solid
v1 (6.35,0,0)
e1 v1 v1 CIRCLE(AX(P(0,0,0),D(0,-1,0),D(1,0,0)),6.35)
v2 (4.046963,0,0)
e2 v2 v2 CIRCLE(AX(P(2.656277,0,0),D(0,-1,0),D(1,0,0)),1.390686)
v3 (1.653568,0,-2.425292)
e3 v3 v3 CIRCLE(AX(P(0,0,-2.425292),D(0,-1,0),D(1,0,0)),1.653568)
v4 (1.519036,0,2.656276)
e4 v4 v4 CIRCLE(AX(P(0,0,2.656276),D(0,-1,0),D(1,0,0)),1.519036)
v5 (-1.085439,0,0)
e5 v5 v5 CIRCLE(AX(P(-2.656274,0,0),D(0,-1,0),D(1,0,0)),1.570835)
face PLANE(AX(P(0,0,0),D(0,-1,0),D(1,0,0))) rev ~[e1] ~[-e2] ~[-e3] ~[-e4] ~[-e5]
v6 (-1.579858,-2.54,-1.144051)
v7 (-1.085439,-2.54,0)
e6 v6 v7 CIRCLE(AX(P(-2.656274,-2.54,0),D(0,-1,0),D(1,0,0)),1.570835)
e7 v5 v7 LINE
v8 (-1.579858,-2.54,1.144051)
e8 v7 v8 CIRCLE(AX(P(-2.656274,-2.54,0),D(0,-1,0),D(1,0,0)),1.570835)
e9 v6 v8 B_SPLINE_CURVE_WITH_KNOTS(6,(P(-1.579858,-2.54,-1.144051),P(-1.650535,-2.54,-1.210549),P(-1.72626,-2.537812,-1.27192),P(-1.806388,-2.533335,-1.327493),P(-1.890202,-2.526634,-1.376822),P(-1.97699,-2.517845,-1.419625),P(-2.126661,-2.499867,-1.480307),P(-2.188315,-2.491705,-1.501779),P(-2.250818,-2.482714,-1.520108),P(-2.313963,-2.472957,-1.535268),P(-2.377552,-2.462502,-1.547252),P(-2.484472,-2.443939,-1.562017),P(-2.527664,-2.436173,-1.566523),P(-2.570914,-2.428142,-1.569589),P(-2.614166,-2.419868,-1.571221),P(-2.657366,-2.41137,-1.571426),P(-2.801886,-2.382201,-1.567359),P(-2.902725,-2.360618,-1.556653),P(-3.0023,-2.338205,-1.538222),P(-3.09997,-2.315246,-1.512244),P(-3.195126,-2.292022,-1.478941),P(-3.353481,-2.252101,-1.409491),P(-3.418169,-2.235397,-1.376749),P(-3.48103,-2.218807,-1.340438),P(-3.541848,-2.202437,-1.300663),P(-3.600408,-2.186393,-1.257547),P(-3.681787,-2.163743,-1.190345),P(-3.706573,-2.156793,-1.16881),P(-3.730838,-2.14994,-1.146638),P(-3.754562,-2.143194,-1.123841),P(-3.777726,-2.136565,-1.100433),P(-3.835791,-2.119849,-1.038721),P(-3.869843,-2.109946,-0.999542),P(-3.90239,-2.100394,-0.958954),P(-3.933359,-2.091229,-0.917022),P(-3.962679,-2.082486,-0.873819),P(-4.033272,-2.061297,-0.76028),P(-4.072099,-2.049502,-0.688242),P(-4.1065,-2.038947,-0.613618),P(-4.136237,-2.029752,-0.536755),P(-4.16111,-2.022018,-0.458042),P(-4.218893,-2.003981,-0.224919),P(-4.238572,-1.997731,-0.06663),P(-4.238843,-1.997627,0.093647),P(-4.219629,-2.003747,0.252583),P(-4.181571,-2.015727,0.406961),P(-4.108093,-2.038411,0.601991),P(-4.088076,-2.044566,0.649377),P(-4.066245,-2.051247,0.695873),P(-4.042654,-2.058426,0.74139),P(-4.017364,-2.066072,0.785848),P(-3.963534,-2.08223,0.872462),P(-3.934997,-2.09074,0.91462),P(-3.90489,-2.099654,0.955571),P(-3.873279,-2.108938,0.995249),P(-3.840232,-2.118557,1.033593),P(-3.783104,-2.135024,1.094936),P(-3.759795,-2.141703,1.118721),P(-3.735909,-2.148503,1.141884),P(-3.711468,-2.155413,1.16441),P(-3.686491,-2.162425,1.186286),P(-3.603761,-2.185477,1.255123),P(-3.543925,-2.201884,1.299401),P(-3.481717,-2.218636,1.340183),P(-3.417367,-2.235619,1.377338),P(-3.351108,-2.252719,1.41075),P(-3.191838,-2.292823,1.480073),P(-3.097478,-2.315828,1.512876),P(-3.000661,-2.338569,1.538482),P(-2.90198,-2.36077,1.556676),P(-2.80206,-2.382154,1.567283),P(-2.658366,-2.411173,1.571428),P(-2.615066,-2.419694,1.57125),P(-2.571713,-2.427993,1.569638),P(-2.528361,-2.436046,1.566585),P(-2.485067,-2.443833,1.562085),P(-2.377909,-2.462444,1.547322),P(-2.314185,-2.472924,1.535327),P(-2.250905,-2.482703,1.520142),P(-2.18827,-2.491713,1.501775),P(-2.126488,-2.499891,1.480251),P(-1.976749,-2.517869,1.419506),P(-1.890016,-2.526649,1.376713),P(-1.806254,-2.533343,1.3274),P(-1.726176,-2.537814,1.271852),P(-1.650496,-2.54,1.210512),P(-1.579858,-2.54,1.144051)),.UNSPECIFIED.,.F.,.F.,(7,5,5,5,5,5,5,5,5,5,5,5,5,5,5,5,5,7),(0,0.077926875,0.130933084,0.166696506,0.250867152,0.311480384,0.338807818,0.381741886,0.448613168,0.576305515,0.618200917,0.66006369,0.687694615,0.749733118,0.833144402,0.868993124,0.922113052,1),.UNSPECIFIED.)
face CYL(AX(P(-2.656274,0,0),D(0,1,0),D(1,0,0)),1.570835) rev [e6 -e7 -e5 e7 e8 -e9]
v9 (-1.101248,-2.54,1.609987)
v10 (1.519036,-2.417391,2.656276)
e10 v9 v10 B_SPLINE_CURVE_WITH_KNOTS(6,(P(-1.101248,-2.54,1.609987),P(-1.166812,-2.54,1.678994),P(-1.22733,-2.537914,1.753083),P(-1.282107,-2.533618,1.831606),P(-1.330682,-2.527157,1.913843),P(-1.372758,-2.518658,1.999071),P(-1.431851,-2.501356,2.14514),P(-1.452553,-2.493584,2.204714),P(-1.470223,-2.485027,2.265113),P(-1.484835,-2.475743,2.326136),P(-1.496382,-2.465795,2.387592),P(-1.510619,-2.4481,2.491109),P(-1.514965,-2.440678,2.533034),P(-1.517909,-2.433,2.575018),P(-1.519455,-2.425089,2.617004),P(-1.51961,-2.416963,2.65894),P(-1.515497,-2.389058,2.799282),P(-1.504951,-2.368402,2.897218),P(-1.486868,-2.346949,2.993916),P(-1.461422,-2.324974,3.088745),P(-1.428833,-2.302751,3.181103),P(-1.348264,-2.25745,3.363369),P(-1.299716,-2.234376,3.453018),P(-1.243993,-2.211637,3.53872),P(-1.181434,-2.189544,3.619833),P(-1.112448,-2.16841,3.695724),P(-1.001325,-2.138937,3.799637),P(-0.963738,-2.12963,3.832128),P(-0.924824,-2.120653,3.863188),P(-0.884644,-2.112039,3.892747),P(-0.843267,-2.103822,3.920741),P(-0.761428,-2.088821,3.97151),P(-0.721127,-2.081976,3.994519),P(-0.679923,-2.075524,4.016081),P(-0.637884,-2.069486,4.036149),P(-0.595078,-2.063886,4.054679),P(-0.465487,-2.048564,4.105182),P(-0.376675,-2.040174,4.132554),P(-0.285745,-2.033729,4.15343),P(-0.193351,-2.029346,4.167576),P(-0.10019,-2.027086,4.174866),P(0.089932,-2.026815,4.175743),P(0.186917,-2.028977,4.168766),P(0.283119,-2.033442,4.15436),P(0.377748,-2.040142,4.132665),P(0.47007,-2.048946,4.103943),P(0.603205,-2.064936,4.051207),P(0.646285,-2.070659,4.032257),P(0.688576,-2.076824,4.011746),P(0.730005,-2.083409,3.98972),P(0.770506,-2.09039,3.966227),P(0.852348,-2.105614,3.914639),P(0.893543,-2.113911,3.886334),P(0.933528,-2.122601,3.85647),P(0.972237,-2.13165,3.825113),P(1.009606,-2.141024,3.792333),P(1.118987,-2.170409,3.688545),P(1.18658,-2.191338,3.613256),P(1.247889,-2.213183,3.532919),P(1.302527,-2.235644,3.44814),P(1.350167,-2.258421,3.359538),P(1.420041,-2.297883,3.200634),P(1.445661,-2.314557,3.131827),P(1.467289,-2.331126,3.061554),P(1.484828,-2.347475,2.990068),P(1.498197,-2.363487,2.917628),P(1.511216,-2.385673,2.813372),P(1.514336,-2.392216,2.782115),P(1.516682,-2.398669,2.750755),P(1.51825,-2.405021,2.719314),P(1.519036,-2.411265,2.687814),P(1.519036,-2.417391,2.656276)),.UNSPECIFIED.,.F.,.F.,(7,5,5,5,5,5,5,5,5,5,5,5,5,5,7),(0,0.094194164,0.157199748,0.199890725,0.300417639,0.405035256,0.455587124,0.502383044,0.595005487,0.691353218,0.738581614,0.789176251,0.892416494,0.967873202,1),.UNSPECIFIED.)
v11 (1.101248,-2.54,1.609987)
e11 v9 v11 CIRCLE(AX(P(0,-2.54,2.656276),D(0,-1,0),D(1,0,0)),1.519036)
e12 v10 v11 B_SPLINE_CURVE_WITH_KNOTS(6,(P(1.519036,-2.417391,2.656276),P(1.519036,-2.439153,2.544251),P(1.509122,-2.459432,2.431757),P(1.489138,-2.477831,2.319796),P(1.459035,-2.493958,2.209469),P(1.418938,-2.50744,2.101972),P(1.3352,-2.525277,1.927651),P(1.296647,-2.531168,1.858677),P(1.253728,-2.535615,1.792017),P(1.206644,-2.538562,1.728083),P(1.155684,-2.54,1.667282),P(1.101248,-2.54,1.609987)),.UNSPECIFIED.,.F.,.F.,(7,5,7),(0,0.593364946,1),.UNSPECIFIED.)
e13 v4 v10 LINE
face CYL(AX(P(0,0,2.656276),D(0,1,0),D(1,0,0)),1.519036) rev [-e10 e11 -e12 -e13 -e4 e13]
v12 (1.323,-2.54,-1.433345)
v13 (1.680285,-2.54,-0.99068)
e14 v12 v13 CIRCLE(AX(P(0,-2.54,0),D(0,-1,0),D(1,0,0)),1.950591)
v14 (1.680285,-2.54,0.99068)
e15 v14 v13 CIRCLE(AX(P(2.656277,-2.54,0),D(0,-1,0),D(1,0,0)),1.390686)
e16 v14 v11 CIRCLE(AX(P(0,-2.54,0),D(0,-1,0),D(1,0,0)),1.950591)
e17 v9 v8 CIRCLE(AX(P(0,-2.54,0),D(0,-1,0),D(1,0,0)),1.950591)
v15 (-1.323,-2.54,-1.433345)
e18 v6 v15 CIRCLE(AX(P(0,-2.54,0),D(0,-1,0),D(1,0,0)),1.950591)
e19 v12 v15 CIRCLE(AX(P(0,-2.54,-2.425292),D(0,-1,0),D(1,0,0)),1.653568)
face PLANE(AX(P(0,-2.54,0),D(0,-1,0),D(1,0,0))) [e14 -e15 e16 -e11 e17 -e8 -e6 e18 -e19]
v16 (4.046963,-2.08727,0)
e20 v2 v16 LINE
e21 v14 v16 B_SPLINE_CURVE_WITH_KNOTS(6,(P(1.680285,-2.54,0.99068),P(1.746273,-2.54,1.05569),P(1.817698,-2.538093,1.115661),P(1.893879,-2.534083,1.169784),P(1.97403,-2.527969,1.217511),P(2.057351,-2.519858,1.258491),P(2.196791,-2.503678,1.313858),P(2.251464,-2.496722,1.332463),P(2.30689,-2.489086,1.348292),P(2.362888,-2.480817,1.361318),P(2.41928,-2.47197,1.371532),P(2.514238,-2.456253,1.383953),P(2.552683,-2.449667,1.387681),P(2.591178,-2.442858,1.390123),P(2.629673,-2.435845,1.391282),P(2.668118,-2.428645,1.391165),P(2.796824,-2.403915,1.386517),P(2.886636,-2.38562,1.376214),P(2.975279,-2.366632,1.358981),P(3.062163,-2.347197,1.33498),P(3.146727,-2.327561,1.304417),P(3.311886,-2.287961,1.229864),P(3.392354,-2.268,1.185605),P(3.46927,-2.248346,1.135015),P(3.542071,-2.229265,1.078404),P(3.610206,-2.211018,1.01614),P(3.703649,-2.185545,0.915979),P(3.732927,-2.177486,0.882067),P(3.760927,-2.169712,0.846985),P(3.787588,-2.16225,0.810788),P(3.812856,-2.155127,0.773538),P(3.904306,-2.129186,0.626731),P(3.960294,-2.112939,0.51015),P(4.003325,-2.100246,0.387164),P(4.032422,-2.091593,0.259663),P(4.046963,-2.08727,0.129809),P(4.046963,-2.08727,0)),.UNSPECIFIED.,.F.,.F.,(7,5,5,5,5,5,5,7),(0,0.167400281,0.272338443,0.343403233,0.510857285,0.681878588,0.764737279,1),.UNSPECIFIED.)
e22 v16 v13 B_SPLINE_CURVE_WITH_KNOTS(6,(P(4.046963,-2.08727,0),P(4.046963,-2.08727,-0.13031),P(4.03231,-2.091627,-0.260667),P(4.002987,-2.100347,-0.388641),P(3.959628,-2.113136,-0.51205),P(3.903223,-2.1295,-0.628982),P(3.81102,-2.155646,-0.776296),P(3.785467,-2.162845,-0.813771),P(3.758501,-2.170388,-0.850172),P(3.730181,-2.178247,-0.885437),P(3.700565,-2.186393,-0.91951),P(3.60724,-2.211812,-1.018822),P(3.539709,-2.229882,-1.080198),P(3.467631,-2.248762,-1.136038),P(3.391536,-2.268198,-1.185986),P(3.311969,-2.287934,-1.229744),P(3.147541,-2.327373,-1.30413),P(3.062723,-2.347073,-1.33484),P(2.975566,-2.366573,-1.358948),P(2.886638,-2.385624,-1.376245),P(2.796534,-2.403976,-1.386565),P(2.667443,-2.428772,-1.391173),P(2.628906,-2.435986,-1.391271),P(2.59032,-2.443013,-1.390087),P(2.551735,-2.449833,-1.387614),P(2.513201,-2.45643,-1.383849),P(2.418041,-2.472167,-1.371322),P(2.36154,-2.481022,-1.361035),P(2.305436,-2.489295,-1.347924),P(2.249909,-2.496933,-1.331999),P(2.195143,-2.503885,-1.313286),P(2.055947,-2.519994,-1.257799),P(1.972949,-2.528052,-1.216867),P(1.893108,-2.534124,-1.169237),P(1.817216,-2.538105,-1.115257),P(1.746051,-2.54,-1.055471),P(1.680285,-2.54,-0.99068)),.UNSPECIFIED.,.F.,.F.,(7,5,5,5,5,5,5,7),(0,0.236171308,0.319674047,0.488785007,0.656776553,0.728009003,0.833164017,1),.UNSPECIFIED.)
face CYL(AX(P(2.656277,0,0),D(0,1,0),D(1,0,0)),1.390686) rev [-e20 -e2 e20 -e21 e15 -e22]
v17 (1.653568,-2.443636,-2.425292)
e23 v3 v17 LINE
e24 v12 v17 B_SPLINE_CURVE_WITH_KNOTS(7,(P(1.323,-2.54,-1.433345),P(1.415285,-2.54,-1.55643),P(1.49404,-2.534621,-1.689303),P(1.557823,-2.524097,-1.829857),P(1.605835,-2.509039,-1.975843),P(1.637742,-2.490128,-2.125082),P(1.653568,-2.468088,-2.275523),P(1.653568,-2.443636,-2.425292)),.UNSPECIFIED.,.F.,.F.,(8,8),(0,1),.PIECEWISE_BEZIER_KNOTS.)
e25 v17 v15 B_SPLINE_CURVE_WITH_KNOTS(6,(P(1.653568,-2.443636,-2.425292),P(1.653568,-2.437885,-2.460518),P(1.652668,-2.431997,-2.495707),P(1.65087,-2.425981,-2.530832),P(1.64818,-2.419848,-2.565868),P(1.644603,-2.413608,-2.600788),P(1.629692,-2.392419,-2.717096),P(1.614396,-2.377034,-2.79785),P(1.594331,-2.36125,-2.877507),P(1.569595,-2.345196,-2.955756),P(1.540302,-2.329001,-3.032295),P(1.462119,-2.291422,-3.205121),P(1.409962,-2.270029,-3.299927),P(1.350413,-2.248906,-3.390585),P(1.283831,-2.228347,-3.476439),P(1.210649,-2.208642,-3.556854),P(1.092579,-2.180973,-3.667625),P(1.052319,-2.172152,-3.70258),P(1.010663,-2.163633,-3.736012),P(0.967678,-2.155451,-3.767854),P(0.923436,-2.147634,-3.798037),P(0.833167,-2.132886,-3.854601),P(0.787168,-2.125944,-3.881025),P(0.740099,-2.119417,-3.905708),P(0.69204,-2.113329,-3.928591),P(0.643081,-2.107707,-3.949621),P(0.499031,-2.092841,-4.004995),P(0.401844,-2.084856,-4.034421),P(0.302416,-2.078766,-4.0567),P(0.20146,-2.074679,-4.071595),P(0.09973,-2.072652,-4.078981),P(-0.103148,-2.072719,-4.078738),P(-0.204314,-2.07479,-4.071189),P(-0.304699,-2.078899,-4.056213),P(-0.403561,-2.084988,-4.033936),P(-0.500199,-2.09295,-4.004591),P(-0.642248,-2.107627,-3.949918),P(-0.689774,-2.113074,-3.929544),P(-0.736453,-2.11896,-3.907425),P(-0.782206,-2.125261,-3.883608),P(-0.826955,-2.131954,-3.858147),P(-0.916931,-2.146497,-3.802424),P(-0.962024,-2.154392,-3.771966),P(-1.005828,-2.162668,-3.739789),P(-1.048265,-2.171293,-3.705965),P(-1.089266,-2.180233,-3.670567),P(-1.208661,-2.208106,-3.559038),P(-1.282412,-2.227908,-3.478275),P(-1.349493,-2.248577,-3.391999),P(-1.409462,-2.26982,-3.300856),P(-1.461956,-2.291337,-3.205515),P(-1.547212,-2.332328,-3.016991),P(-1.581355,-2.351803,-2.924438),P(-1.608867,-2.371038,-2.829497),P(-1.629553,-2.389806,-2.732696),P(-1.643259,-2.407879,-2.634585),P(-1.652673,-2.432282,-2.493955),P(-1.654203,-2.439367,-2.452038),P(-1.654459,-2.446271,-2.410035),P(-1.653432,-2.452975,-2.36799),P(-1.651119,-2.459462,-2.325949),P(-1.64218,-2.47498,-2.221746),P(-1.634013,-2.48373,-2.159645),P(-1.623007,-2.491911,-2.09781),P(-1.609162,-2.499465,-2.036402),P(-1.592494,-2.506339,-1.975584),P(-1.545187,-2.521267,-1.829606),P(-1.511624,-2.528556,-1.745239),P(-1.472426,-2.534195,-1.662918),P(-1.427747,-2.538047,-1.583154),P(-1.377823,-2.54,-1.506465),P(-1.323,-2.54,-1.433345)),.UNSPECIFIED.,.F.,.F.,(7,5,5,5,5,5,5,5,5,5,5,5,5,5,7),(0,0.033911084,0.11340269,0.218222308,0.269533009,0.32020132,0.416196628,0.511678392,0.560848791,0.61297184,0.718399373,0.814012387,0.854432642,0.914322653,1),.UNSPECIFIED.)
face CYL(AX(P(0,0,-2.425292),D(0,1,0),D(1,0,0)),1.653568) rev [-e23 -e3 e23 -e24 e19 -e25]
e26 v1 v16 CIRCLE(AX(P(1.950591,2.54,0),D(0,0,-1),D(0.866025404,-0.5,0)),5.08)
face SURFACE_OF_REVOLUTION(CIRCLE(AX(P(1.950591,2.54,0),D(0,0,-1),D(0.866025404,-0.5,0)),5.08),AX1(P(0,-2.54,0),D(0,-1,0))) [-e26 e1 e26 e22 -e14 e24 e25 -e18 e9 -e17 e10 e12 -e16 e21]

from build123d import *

# Parameters (mm, degrees)
F0_R     = 6.35
F0_R_2   = 1.6535683919
F0_R_3   = 1.5708348414
F0_R_4   = 1.3906858061
F0_R_5   = 1.5190356383
F1_DEPTH = 2.54


# Not quite as in the source:
# - a fillet or chamfer that OpenCascade refuses, or shapes differently, is made with other operations: its cross-section is extruded or revolved along the edge and cut away or added


with BuildPart() as f1:
    # F0 (on Front) → F1 (new body)
    with BuildSketch(Plane.XZ):
        Circle(F0_R)
        with Locations((0, -2.4252922231)):
            Circle(F0_R_2, mode=Mode.SUBTRACT)
        with Locations((-2.6562736366, 0)):
            Circle(F0_R_3, mode=Mode.SUBTRACT)
        with Locations((2.6562768198, 0)):
            Circle(F0_R_4, mode=Mode.SUBTRACT)
        with Locations((0, 2.6562763651)):
            Circle(F0_R_5, mode=Mode.SUBTRACT)
    extrude(amount=F1_DEPTH)

    # F2: fillet of radius 5.08 on 1 edges, made by hand

    # F2_s1 → F2_t2 (revolve, cut)
    with BuildSketch(Plane.XY):
        with BuildLine():
            ThreePointArc((6.35, 0), (4.4905909488, -1.8594090512), (1.9505909488, -2.54))
            Line((1.9505909488, -2.54), (6.35, -2.54))
            Line((6.35, -2.54), (6.35, 0))
        make_face()
    revolve(axis=Axis((0, -2.54, 0), (0, -1, 0)), mode=Mode.SUBTRACT)


solid = f1.part
